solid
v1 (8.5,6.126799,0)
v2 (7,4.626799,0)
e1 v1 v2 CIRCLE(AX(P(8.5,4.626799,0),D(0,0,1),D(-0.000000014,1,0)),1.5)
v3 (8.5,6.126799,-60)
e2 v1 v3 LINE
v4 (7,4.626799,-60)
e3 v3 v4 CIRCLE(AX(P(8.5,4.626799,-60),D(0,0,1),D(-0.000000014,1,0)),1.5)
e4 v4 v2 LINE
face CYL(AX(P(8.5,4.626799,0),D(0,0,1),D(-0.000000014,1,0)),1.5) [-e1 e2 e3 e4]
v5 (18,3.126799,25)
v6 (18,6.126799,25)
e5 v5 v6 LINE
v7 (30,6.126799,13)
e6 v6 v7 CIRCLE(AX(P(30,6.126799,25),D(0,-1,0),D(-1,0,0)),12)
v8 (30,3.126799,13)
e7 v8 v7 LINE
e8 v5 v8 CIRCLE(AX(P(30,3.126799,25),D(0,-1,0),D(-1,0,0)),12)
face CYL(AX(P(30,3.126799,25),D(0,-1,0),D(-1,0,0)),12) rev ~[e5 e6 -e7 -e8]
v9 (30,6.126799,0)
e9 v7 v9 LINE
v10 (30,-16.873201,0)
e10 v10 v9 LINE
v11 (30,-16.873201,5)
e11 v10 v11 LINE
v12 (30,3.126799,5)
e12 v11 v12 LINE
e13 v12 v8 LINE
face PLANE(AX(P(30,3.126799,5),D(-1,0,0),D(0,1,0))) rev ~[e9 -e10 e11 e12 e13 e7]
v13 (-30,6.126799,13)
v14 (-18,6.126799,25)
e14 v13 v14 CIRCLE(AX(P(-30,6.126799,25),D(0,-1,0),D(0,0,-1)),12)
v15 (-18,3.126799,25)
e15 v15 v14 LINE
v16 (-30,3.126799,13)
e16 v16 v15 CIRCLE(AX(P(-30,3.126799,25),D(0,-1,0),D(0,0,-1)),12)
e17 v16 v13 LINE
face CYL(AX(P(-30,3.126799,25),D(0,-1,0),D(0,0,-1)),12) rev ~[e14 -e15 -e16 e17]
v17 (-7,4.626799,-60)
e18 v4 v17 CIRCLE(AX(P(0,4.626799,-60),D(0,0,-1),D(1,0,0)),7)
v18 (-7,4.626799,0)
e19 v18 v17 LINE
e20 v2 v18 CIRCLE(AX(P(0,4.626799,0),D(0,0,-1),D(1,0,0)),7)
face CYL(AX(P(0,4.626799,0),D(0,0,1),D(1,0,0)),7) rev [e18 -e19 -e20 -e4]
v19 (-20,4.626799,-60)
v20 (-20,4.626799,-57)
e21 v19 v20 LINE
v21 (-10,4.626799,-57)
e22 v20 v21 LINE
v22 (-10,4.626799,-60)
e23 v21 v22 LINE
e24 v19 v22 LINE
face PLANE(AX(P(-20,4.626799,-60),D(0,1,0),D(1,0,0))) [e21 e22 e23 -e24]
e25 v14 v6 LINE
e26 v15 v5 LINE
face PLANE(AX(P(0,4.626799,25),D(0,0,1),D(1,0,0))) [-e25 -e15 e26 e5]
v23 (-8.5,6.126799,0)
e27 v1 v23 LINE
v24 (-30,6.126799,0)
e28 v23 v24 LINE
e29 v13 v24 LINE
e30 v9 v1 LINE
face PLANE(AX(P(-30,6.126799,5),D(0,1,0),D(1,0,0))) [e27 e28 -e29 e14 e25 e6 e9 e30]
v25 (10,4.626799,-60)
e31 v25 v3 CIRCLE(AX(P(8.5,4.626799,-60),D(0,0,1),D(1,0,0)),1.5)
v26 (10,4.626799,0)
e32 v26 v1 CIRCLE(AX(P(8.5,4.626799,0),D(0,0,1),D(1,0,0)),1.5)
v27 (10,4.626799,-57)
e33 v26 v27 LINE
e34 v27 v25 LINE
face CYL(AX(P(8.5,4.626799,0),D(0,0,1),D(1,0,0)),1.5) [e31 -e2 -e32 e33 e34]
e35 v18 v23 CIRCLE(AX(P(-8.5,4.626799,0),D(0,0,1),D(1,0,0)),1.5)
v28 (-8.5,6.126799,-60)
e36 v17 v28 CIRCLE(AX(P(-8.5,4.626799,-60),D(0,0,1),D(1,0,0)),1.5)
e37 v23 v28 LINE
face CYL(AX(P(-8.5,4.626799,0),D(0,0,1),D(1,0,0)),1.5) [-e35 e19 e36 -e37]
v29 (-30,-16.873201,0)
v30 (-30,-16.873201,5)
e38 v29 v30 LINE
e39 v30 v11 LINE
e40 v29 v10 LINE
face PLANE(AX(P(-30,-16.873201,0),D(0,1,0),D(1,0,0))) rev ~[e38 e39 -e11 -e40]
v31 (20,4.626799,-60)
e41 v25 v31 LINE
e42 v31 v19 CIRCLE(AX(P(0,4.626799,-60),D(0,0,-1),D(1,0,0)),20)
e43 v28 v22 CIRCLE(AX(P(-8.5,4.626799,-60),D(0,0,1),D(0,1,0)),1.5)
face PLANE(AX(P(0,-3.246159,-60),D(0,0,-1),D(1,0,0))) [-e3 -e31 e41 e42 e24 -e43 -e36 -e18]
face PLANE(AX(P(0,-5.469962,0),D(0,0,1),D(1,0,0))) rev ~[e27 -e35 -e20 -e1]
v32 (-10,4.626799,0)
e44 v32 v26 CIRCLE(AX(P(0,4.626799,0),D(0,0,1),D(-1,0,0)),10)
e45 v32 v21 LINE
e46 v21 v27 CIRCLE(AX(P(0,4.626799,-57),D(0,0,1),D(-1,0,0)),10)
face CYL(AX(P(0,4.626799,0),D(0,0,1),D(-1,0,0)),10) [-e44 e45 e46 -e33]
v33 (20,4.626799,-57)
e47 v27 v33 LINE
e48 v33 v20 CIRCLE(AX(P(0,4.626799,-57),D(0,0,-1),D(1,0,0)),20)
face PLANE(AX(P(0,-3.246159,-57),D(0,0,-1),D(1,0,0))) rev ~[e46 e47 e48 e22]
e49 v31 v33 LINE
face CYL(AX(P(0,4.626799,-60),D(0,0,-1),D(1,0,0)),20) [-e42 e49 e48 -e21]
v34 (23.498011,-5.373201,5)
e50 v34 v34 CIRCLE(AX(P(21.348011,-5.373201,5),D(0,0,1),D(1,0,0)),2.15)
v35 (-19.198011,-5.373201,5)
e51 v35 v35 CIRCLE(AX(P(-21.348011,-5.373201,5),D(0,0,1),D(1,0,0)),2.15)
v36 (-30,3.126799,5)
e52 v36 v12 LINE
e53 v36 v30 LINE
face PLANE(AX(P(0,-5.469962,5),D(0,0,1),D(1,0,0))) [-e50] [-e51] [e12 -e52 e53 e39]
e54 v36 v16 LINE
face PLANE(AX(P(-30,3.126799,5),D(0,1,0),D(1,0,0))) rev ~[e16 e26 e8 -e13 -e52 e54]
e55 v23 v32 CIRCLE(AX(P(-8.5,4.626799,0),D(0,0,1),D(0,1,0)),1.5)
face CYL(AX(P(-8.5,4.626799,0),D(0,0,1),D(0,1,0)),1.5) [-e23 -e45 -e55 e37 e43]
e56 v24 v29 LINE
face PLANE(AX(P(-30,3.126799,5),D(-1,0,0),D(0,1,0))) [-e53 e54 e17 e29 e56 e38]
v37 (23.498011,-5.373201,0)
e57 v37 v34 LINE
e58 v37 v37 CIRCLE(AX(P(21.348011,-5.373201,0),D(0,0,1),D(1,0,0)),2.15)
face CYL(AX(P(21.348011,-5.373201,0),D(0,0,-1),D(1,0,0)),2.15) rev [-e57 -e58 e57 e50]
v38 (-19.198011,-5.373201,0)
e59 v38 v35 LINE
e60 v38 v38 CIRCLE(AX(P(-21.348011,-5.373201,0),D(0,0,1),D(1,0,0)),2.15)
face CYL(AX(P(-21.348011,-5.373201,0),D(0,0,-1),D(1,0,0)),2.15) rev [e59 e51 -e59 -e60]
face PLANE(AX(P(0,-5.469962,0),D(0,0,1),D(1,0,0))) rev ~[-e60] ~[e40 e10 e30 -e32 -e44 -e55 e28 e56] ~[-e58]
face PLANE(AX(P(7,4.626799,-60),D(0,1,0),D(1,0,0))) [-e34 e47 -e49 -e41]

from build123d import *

# Parameters (mm, degrees)
F0_R     = 2.15
F1_DEPTH = 5
F2_W     = 60
F2_H     = 3
F3_DEPTH = 20
F5_DEPTH = 4
F6_DEPTH = 60
F8_DEPTH = 3


# Not quite as in the source:
# - a feature names something its author has since deleted; it is built from what else it names


with BuildPart() as f1:
    # F0 (on Top) → F1 (new body)
    with BuildSketch(Plane.XY):
        with BuildLine():
            ThreePointArc((-10, 4.6267989092), (-9.5606601718, 5.6874590809), (-8.5, 6.1267989092))
            Line((-8.5, 6.1267989092), (-30, 6.1267989092))
            Line((-30, 6.1267989092), (-30, -16.8732010908))
            Line((-30, -16.8732010908), (30, -16.8732010908))
            Line((30, -16.8732010908), (30, 6.1267989092))
            Line((30, 6.1267989092), (8.4999999793, 6.1267989092))
            ThreePointArc((8.4999999793, 6.1267989092), (9.5606601645, 5.6874590882), (10, 4.6267989092))
            ThreePointArc((10, 4.6267989092), (0, -5.3732010908), (-10, 4.6267989092))
        make_face()
        with Locations((-21.3480107486, -5.3732010908)):
            Circle(F0_R, mode=Mode.SUBTRACT)
        with Locations((21.3480107486, -5.3732010908)):
            Circle(F0_R, mode=Mode.SUBTRACT)
        with BuildLine():
            ThreePointArc((-7, 4.6267989092), (-7.4393398282, 5.6874590809), (-8.5, 6.1267989092))
            ThreePointArc((-8.5, 6.1267989092), (-9.5606601718, 5.6874590809), (-10, 4.6267989092))
            ThreePointArc((-10, 4.6267989092), (0, -5.3732010908), (10, 4.6267989092))
            ThreePointArc((10, 4.6267989092), (9.5606601645, 5.6874590882), (8.4999999793, 6.1267989092))
            ThreePointArc((8.4999999793, 6.1267989092), (7.4393398209, 5.6874590736), (7, 4.6267989092))
            ThreePointArc((7, 4.6267989092), (0, -2.3732010908), (-7, 4.6267989092))
        make_face()
        with BuildLine():
            Line((8, 6.1267989092), (-8, 6.1267989092))
            Line((-8, 6.1267989092), (-8.5, 6.1267989092))
            ThreePointArc((-8.5, 6.1267989092), (-7.4393398282, 5.6874590809), (-7, 4.6267989092))
            ThreePointArc((-7, 4.6267989092), (0, -2.3732010908), (7, 4.6267989092))
            ThreePointArc((7, 4.6267989092), (7.4393398209, 5.6874590736), (8.4999999793, 6.1267989092))
            Line((8.4999999793, 6.1267989092), (8, 6.1267989092))
        make_face()
    extrude(amount=F1_DEPTH)

    # F2 (on face) → F3 (join)
    with BuildSketch(Plane.XY.offset(5)):
        with Locations((0, 4.6267989092)):
            Rectangle(F2_W, F2_H)
    extrude(amount=F3_DEPTH)

    # F4 (on face) → F5 (cut)
    with BuildSketch(Plane.XZ.offset(-3.1267989092)):
        with BuildLine():
            Line((-30, 25), (-30, 13))
            ThreePointArc((-30, 13), (-21.5147186258, 16.5147186258), (-18, 25))
            Line((-18, 25), (-30, 25))
        make_face()
        with BuildLine():
            Line((30, 25), (18, 25))
            ThreePointArc((18, 25), (21.5147186258, 16.5147186258), (30, 13))
            Line((30, 13), (30, 25))
        make_face()
    extrude(amount=-F5_DEPTH, mode=Mode.SUBTRACT)

    # F0 (on Top) → F6 (join)
    with BuildSketch(Plane.XY):
        with BuildLine():
            ThreePointArc((-7, 4.6267989092), (-7.4393398282, 5.6874590809), (-8.5, 6.1267989092))
            ThreePointArc((-8.5, 6.1267989092), (-9.5606601718, 5.6874590809), (-10, 4.6267989092))
            ThreePointArc((-10, 4.6267989092), (0, -5.3732010908), (10, 4.6267989092))
            ThreePointArc((10, 4.6267989092), (9.5606601645, 5.6874590882), (8.4999999793, 6.1267989092))
            ThreePointArc((8.4999999793, 6.1267989092), (7.4393398209, 5.6874590736), (7, 4.6267989092))
            ThreePointArc((7, 4.6267989092), (0, -2.3732010908), (-7, 4.6267989092))
        make_face()
    extrude(amount=-F6_DEPTH)

    # F7 (on face) → F8 (join)
    with BuildSketch(Plane(origin=(0, 0, -60), x_dir=(1, 0, 0), z_dir=(0, 0, -1))):
        with BuildLine():
            ThreePointArc((20, -4.6267989092), (0, 15.3732010908), (-20, -4.6267989092))
            Line((-20, -4.6267989092), (-10, -4.6267989092))
            ThreePointArc((-10, -4.6267989092), (0, 5.3732010908), (10, -4.6267989092))
            Line((10, -4.6267989092), (20, -4.6267989092))
        make_face()
        with BuildLine():
            ThreePointArc((10, -4.6267989092), (0, 5.3732010908), (-10, -4.6267989092))
            Line((-10, -4.6267989092), (-7, -4.6267989092))
            ThreePointArc((-7, -4.6267989092), (0, 2.3732010908), (7, -4.6267989092))
            Line((7, -4.6267989092), (10, -4.6267989092))
        make_face()
    extrude(amount=-F8_DEPTH)


solid = f1.part
